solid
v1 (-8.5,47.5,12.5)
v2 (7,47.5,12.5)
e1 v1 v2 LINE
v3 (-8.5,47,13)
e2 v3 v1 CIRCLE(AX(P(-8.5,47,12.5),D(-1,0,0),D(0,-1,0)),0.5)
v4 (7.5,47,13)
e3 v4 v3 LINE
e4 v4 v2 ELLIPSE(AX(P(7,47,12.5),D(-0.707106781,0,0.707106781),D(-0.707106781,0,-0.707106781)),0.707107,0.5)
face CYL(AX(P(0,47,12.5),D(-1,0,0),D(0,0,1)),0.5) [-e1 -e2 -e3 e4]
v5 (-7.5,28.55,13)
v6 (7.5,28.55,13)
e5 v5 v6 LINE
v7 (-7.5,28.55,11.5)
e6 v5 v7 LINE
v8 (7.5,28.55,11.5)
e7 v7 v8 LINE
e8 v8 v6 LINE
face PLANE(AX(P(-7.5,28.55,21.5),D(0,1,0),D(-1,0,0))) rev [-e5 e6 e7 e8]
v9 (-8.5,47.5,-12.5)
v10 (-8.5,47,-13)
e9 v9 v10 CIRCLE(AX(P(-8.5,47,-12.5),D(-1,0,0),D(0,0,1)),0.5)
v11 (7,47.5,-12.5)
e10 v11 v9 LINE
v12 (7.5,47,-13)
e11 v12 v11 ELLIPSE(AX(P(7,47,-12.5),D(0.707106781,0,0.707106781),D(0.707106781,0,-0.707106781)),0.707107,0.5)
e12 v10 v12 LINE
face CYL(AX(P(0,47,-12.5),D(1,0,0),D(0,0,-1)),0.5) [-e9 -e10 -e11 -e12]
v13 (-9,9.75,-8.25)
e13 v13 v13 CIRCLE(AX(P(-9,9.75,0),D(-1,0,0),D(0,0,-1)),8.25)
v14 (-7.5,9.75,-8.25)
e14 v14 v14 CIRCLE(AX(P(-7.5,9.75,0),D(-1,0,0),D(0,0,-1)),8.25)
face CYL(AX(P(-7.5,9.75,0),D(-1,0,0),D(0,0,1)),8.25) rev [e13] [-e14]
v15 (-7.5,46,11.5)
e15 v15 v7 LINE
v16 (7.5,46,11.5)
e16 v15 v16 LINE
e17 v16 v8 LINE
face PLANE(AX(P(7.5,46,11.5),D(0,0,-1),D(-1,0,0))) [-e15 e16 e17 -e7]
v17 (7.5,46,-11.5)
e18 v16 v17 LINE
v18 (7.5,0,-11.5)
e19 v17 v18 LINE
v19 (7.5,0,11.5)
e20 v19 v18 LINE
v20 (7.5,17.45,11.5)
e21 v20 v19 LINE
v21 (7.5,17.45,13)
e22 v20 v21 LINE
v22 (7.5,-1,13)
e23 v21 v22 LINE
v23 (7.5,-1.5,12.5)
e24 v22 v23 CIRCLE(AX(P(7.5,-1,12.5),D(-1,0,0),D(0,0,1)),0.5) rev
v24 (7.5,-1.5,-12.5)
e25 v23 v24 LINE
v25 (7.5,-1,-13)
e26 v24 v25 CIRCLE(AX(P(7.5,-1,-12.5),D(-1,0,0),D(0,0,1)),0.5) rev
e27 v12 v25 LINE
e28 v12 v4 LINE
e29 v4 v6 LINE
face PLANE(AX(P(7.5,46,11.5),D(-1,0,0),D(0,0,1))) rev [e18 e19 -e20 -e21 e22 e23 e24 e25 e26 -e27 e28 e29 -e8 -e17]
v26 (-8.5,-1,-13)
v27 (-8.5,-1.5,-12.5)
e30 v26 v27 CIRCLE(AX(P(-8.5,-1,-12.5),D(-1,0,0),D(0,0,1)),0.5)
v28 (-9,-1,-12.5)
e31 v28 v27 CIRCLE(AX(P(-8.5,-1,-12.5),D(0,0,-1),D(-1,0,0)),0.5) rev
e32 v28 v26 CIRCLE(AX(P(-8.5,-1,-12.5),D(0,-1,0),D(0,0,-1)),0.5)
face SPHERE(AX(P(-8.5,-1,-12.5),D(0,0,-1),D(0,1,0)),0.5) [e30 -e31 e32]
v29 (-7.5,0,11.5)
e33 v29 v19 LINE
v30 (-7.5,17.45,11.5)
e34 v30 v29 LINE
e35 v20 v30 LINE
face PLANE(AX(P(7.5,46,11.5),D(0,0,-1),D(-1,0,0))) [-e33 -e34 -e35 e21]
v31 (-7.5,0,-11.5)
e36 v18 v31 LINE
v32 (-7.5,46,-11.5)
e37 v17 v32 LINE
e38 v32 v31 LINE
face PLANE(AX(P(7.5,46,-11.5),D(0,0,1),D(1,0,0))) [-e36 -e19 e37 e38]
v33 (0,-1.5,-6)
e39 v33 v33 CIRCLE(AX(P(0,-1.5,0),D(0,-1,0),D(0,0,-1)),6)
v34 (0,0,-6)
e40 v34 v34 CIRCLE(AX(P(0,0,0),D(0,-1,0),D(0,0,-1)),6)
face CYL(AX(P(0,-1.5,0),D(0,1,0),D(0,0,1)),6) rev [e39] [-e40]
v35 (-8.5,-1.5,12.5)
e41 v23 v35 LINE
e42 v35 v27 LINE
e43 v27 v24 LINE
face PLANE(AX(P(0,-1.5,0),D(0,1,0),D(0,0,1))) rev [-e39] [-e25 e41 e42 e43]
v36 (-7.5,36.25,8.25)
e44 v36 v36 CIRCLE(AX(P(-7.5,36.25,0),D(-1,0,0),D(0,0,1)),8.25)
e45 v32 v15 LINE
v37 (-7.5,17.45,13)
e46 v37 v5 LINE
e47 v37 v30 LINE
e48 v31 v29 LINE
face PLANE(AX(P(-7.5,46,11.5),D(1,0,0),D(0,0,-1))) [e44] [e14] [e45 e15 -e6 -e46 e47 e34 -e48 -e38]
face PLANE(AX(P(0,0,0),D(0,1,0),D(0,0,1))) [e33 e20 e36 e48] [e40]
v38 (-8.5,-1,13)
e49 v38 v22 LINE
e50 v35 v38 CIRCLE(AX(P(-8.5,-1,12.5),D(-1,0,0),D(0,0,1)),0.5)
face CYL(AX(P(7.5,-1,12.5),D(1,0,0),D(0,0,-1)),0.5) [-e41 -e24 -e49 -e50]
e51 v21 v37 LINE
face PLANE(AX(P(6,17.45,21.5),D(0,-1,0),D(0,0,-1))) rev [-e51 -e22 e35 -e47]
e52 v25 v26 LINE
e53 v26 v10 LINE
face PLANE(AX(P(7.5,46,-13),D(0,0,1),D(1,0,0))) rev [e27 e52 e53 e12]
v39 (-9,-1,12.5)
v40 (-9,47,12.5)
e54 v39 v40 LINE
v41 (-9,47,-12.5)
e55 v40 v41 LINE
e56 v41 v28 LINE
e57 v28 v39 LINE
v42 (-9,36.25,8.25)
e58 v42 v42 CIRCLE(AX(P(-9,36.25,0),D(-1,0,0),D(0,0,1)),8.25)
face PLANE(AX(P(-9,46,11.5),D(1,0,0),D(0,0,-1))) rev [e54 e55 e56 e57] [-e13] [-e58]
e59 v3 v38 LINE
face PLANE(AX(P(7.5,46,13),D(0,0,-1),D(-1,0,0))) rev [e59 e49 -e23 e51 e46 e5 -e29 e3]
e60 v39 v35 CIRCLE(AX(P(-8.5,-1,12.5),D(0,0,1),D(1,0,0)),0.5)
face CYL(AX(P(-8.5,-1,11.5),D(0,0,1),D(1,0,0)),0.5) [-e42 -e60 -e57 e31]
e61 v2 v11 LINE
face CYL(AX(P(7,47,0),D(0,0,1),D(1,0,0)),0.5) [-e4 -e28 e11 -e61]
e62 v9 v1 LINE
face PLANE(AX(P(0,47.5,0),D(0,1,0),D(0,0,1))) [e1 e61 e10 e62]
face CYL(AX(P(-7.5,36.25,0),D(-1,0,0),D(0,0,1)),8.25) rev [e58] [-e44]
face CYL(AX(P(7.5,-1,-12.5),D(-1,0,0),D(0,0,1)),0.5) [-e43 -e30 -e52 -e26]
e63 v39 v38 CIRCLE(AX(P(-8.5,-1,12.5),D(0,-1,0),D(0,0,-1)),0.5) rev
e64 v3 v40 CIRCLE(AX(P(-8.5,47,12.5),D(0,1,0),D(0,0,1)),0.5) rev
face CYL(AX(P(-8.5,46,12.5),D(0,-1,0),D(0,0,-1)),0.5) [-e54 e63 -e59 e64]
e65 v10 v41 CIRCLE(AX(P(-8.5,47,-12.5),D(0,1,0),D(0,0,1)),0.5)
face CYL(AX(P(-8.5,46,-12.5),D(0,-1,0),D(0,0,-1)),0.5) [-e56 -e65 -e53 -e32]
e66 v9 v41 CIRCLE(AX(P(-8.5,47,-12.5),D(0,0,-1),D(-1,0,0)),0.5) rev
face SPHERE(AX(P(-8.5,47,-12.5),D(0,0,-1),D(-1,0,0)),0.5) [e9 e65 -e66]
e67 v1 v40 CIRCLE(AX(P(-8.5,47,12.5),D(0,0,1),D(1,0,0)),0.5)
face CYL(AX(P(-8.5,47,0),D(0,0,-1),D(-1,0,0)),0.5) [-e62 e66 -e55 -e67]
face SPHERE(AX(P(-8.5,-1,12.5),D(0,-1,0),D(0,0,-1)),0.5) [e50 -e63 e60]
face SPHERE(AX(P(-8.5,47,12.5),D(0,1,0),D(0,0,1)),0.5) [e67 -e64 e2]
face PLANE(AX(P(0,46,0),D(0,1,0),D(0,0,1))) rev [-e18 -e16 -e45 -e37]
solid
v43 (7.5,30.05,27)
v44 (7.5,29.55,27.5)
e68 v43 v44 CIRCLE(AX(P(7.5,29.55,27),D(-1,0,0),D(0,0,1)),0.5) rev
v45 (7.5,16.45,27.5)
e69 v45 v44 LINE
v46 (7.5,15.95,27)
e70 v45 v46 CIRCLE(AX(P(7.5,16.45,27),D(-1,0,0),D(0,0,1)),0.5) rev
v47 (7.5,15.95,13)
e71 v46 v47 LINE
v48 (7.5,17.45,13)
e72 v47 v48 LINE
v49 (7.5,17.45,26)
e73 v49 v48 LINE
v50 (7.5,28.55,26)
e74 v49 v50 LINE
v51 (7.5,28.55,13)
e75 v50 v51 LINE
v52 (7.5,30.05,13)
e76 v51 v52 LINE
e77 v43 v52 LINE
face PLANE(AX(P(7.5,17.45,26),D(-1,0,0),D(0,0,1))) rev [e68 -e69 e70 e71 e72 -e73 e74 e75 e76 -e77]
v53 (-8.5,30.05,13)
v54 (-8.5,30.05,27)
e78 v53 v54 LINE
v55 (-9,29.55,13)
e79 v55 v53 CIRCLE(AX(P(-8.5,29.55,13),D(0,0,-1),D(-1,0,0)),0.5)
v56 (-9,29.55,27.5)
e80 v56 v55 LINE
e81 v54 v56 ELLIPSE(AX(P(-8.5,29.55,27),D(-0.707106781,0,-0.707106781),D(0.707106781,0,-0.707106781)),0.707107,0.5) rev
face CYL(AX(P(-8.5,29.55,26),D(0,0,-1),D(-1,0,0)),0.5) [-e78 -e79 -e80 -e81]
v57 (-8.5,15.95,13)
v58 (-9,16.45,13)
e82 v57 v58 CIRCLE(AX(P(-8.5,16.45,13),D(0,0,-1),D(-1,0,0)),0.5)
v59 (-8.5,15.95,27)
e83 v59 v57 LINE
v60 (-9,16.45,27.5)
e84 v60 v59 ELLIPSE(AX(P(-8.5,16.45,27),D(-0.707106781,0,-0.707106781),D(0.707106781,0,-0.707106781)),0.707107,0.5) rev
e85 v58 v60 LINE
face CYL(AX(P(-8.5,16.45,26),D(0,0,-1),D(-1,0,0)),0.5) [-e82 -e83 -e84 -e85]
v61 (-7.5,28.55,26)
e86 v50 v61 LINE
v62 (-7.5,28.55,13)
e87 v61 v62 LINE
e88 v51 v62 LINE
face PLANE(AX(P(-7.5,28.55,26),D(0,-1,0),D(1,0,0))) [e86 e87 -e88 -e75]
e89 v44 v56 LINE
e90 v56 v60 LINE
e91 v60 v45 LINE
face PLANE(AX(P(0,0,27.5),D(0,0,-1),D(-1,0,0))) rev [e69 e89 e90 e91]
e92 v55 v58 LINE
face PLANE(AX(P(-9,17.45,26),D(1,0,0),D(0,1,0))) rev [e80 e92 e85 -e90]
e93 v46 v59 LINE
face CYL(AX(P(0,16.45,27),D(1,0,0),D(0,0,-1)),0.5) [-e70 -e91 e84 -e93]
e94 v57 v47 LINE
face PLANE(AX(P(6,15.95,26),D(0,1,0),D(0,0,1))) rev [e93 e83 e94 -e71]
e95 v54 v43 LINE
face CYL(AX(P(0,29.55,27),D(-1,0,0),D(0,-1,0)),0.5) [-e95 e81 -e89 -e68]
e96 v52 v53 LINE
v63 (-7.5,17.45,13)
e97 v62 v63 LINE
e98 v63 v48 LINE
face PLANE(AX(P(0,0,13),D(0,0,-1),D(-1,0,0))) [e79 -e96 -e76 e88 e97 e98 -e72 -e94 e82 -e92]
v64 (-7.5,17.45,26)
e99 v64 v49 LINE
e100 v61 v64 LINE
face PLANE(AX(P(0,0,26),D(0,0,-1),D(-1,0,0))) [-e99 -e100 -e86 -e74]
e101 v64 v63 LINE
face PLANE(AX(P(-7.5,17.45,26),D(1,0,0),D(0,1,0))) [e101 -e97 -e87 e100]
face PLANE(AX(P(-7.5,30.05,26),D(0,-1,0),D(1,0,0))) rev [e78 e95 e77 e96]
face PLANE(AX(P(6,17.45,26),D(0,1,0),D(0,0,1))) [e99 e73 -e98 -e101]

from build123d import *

# Parameters (mm, degrees)
SKETCH_1_W          = 15
SKETCH_1_H          = 23
EXTRUDE_1_DEPTH     = 46
SHELL_1_T           = 1.5
SKETCH_2_R          = 6
CUT_EXTRUDE_4_DEPTH = 1.5
SKETCH_3_R          = 8.25
CUT_EXTRUDE_5_DEPTH = 1.5
SKETCH_4_W          = 13.5
SKETCH_4_H          = 11.1
CUT_EXTRUDE_6_DEPTH = 10
EXTRUDE_2_DEPTH     = 13
SHELL_2_T           = 1.5
FILLET_3_R          = 0.5
SKETCH_7_W          = 1.5
SKETCH_7_H          = 11.1
CUT_EXTRUDE_7_DEPTH = 1.5
FILLET_4_R          = 0.5


with BuildPart() as part:
    # 草图1 → 凸台-拉伸1 (new body)
    with BuildSketch(Plane(origin=(0, 0, 0), x_dir=(1, 0, 0), z_dir=(0, 1, 0))):
        Rectangle(SKETCH_1_W, SKETCH_1_H)
    extrude(amount=EXTRUDE_1_DEPTH)

    # 抽壳1
    shell_1_openings = [part.faces().sort_by_distance(p)[0] for p in [
        (7.5, 23, 0),
    ]]
    offset(amount=SHELL_1_T, openings=shell_1_openings, kind=Kind.INTERSECTION)

    # 草图2 → 切除-拉伸4 (cut)
    with BuildSketch(Plane(origin=(0, 0, 0), x_dir=(-1, 0, 0), z_dir=(0, -1, 0))):
        with Locations(Location((0, 0, 0), (0, 0, 90))):
            Circle(SKETCH_2_R)
    extrude(amount=CUT_EXTRUDE_4_DEPTH, mode=Mode.SUBTRACT)

    # 草图3 → 切除-拉伸5 (cut)
    with BuildSketch(Plane.ZY.offset(9)):
        with Locations((0, 36.25)):
            Circle(SKETCH_3_R)
        with Locations(Location((0, 9.75, 0), (0, 0, 180))):
            Circle(SKETCH_3_R)
    extrude(amount=-CUT_EXTRUDE_5_DEPTH, mode=Mode.SUBTRACT)

    # 草图4 → 切除-拉伸6 (cut)
    with BuildSketch(Plane(origin=(0, 0, 11.5), x_dir=(-1, 0, 0), z_dir=(0, 0, -1))):
        with Locations((0.75, 23)):
            Rectangle(SKETCH_4_W, SKETCH_4_H)
    extrude(amount=-CUT_EXTRUDE_6_DEPTH, mode=Mode.SUBTRACT)

    # 圆角3
    fillet_3_edges = [part.edges().sort_by_distance(p)[0] for p in [
        (7.5, 47.5, 0),
        (-0.75, 47.5, -13),
        (-9, 47.5, 0),
        (-0.75, -1.5, -13),
        (-0.75, -1.5, 13),
        (-9, -1.5, 0),
        (-9, 23, -13),
        (-9, 23, 13),
        (-0.75, 47.5, 13),
    ]]
    fillet(fillet_3_edges, radius=FILLET_3_R)

    # 草图7 → 切除-拉伸7 (cut)
    with BuildSketch(Plane.XY.offset(13)):
        with Locations((6.75, 23)):
            Rectangle(SKETCH_7_W, SKETCH_7_H)
    extrude(amount=-CUT_EXTRUDE_7_DEPTH, mode=Mode.SUBTRACT)


with BuildPart() as body_2:
    # 草图5 → 凸台-拉伸2 (new body)
    with BuildSketch(Plane.XY.offset(13)):
        Polygon((-7.5, 28.55), (6, 28.55), (7.5, 28.55), (7.5, 17.45), (6, 17.45), (-7.5, 17.45), align=None)
    extrude(amount=EXTRUDE_2_DEPTH)

    # 抽壳2
    shell_2_openings = [body_2.faces().sort_by_distance(p)[0] for p in [
        (0, 23, 13),
        (7.5, 23, 19.5),
    ]]
    offset(amount=SHELL_2_T, openings=shell_2_openings, kind=Kind.INTERSECTION)

    # 圆角4
    # the kernel refuses this fillet: 0.5 mm, written as the material it takes off along each edge
    with BuildSketch(Plane(origin=(-9, 30.05, 11.75), x_dir=(1, 0, 0), z_dir=(0, 0, 1)), Plane(origin=(-9, 15.95, 28.75), x_dir=(1, 0, 0), z_dir=(0, 0, -1))) as fillet_4_piece_1:
        with BuildLine():
            CenterArc((FILLET_4_R, -FILLET_4_R), FILLET_4_R, 90, 90)
            Line((0, -FILLET_4_R), (0, 0))
            Line((0, 0), (FILLET_4_R, 0))
        make_face()
    extrude(amount=17, mode=Mode.SUBTRACT)
    with BuildSketch(Plane(origin=(8.75, 30.05, 27.5), x_dir=(0, 0, -1), z_dir=(-1, 0, 0)), Plane(origin=(-10.25, 15.95, 27.5), x_dir=(0, 0, -1), z_dir=(1, 0, 0))) as fillet_4_piece_2:
        with BuildLine():
            CenterArc((FILLET_4_R, FILLET_4_R), FILLET_4_R, 180, 90)
            Line((0, FILLET_4_R), (0, 0))
            Line((0, 0), (FILLET_4_R, 0))
        make_face()
    extrude(amount=19, mode=Mode.SUBTRACT)


solid = Compound([part.part, body_2.part])
